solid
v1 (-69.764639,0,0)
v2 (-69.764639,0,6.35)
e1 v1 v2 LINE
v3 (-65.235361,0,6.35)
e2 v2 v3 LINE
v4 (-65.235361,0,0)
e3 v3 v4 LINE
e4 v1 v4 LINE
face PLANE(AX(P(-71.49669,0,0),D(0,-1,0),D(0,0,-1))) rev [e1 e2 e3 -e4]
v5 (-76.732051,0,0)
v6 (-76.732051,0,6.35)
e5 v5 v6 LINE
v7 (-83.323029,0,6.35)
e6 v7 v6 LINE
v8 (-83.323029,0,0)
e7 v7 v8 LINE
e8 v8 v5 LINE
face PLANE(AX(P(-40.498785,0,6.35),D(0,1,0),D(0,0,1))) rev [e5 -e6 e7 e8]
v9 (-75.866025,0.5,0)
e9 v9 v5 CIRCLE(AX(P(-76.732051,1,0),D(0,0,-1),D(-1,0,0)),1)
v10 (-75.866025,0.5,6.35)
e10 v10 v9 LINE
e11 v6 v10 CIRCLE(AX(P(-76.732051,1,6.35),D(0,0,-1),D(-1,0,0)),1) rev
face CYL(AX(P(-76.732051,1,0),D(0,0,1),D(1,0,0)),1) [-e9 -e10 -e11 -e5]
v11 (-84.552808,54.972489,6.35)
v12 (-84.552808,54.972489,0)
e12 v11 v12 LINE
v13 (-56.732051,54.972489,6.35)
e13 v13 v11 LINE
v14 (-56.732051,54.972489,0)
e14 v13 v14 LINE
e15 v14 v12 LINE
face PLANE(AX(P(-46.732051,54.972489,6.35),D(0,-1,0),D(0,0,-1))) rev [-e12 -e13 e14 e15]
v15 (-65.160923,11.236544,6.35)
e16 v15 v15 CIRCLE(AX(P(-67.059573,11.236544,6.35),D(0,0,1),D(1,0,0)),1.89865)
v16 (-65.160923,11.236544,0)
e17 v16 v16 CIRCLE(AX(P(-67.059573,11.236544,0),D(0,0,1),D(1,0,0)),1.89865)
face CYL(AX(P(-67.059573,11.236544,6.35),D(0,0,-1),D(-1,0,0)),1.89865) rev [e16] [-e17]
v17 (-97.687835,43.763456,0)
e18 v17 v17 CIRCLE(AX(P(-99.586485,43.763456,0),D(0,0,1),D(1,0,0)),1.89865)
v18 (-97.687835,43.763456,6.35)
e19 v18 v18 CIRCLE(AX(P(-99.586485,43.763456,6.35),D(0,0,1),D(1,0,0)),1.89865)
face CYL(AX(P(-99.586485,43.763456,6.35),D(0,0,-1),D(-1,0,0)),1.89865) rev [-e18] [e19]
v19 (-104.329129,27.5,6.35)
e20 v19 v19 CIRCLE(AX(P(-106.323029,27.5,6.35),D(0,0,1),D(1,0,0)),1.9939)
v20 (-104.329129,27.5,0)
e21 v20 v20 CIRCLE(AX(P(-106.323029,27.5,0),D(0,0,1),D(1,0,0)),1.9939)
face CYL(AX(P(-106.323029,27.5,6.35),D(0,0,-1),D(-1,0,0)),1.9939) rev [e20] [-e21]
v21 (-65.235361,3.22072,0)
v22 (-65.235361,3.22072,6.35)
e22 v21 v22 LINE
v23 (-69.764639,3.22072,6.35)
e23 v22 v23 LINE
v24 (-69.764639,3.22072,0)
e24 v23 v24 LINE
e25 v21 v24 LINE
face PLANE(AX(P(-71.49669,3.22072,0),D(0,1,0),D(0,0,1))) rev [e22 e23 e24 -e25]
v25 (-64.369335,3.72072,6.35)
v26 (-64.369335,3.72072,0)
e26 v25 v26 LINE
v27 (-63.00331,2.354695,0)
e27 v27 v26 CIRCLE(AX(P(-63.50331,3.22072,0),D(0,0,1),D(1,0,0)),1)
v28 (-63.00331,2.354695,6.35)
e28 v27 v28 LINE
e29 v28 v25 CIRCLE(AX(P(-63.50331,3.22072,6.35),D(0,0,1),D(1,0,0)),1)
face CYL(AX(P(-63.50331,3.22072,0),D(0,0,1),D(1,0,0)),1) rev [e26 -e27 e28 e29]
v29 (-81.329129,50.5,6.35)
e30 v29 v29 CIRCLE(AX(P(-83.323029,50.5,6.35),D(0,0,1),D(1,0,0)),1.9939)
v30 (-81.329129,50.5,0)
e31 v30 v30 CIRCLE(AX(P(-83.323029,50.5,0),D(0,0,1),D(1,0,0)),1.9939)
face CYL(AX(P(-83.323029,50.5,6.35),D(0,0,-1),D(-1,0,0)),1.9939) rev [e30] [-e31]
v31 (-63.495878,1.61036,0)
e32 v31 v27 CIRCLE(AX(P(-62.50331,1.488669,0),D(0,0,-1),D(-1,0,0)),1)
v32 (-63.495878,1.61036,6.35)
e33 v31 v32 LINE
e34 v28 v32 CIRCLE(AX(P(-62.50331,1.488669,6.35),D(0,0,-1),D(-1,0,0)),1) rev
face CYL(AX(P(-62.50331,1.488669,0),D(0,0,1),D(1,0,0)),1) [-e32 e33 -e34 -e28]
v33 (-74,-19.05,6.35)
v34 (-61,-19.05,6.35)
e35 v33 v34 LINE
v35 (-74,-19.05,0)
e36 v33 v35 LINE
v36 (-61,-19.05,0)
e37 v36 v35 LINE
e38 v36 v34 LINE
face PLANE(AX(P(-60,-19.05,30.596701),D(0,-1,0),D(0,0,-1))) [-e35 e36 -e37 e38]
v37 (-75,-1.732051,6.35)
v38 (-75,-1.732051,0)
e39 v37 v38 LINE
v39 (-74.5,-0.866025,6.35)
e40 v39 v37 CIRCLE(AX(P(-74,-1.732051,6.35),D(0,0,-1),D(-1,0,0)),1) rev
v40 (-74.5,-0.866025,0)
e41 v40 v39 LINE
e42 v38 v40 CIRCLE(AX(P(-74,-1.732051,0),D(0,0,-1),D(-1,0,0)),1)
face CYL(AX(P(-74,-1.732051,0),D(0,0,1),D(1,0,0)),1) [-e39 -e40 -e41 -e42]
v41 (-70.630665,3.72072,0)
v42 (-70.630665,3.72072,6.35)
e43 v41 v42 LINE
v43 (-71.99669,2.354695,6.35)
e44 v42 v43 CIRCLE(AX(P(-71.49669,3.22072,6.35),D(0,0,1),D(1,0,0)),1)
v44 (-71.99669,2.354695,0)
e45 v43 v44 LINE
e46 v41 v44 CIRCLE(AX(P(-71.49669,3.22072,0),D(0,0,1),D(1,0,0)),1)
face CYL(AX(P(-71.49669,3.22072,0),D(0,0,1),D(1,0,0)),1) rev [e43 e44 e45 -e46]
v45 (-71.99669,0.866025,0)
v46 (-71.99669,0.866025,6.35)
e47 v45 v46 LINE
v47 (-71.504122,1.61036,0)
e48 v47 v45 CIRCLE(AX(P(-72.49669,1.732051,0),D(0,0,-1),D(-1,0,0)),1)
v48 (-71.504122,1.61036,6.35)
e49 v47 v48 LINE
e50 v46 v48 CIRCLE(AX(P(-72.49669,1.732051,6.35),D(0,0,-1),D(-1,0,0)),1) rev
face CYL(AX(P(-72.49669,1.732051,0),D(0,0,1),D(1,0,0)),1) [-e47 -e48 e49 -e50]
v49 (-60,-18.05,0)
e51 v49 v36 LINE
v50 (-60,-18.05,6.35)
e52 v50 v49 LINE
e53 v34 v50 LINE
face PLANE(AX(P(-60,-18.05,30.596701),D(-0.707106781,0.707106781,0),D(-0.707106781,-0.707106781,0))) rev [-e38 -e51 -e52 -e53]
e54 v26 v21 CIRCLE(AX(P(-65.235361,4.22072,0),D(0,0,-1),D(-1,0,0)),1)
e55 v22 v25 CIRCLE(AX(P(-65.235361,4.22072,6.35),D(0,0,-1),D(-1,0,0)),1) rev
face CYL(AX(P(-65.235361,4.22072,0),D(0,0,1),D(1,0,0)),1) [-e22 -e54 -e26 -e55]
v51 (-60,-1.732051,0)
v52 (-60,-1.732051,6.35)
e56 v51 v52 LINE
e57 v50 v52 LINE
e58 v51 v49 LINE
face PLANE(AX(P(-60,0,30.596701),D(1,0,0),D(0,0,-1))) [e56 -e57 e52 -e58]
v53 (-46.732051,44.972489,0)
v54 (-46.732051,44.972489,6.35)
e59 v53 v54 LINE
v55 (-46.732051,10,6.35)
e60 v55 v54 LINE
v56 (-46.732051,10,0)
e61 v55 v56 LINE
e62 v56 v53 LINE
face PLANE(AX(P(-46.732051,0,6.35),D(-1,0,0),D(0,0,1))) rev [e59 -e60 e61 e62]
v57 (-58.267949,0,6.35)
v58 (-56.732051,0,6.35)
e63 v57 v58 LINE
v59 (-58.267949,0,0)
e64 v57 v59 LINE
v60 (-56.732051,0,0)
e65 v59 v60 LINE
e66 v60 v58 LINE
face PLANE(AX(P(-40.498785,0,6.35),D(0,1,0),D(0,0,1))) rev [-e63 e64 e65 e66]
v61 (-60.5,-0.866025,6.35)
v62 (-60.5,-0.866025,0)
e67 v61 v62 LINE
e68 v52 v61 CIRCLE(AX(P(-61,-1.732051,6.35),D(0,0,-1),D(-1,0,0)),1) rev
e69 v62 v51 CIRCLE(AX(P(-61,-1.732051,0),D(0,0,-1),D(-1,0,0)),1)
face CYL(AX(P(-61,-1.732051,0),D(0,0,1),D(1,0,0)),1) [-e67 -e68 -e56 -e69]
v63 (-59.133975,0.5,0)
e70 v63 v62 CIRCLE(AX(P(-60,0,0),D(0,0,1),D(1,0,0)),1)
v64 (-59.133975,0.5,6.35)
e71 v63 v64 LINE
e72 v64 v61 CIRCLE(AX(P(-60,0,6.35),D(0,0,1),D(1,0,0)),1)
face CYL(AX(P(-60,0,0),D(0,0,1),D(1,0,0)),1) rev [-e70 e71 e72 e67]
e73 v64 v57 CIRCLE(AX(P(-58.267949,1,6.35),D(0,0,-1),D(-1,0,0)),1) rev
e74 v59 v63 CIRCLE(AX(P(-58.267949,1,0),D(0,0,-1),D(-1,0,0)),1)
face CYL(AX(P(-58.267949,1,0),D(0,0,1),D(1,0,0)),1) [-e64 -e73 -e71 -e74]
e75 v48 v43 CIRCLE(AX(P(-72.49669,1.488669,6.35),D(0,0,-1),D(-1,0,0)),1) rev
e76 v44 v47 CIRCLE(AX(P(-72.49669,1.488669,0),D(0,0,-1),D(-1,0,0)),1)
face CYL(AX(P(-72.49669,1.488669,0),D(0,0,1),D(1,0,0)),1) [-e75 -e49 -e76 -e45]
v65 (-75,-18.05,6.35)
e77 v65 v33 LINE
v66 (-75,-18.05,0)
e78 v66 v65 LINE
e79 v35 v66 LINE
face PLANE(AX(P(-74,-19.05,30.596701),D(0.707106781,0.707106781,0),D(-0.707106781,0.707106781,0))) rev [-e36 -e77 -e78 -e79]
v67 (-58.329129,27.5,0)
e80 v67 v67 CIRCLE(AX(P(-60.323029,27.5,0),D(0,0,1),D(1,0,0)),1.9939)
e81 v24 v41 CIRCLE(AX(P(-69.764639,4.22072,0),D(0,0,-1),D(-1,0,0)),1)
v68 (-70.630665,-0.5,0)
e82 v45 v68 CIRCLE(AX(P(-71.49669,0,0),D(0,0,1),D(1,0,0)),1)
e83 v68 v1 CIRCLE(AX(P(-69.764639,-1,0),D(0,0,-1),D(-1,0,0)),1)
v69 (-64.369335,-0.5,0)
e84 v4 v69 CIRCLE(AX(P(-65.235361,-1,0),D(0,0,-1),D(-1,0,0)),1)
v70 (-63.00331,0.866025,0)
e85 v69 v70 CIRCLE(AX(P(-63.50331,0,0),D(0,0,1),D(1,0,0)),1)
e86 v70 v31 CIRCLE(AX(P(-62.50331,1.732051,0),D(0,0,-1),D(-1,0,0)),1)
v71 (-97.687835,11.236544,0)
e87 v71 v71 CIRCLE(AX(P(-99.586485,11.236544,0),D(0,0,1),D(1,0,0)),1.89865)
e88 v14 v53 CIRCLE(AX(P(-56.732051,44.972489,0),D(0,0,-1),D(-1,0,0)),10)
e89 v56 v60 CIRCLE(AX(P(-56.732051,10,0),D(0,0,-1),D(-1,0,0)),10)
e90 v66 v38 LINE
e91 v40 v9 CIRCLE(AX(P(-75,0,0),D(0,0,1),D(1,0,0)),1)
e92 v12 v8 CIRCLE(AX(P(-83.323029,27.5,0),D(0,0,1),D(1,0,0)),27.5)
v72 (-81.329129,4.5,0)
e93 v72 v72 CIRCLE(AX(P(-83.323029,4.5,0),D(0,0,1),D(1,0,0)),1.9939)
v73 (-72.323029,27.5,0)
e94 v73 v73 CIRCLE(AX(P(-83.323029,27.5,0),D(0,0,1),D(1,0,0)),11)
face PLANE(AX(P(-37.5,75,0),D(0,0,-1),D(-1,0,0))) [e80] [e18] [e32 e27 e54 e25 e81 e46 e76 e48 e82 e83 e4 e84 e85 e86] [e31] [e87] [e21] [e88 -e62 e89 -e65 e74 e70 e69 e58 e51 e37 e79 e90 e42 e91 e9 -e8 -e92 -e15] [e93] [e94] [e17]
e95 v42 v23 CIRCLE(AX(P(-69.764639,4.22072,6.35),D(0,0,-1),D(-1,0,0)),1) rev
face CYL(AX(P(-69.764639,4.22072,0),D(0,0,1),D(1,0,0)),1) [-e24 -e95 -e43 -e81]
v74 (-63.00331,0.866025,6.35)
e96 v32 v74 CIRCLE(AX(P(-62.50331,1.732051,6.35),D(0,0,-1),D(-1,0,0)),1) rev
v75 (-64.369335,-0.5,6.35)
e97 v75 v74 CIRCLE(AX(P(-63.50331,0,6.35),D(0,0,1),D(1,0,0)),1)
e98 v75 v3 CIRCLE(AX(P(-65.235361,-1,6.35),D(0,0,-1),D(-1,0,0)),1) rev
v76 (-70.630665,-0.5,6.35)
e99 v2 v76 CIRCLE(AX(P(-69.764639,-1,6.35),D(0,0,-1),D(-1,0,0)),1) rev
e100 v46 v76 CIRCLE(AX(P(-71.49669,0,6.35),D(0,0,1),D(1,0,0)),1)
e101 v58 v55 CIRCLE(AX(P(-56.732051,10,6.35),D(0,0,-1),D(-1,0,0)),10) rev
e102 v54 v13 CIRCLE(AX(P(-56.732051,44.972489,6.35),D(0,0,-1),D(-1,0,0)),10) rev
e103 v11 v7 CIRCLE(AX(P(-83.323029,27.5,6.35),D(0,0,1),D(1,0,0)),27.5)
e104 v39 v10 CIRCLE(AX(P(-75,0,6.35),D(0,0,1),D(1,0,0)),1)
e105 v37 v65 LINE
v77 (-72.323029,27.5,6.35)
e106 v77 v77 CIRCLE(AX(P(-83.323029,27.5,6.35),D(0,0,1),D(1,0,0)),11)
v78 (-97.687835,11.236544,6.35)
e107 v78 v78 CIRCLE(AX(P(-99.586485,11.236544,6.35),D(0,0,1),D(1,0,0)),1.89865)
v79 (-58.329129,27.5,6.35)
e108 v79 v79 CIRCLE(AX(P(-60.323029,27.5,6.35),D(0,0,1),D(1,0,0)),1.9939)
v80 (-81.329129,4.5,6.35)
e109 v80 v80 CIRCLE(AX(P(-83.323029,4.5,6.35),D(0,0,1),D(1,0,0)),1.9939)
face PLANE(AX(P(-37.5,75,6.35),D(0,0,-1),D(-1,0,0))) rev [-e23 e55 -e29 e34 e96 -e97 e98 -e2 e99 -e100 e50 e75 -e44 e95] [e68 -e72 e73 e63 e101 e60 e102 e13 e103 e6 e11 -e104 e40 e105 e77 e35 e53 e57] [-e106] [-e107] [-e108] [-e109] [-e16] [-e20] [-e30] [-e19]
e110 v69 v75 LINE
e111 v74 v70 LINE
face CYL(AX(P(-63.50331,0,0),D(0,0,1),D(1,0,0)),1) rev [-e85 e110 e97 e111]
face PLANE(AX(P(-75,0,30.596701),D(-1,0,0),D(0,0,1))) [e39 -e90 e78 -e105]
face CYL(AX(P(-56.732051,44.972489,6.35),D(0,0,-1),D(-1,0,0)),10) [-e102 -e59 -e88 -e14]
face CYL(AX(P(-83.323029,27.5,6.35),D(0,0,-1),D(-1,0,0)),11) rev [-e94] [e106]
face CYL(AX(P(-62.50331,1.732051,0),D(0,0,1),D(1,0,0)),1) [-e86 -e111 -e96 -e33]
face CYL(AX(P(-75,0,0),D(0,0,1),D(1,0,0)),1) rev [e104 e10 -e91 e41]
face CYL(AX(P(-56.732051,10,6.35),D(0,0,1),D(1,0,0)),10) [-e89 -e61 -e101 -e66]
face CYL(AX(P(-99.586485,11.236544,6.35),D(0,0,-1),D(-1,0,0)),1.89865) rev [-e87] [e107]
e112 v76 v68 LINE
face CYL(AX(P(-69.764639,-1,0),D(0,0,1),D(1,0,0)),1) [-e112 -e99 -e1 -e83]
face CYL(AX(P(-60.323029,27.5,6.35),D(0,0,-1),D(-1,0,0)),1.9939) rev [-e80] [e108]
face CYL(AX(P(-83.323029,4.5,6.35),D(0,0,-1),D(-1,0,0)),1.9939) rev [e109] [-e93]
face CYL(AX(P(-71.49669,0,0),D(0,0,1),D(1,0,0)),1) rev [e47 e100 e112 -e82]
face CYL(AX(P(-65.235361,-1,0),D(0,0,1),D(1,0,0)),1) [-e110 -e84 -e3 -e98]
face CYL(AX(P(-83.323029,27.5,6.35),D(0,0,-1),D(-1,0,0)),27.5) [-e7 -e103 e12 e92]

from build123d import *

# Parameters (mm, degrees)
SKETCH1_R           = 11
SKETCH1_R_2         = 1.89865
SKETCH1_R_3         = 1.9939
BOSS_EXTRUDE1_DEPTH = 6.35
FILLET1_R           = 10
SKETCH2_W           = 15
SKETCH2_H           = 19.05
BOSS_EXTRUDE2_DEPTH = 6.35
CHAMFER1_SIZE       = 1
SKETCH3_R           = 1
CUT_EXTRUDE1_DEPTH  = 159.045298363
SKETCH4_W           = 7.99338
SKETCH4_H           = 3.22072
CUT_EXTRUDE2_DEPTH  = 159.045298363
FILLET3_R           = 1
CUT_EXTRUDE3_DEPTH  = 159.045298363
FILLET4_R           = 10
SKETCH9_R           = 1
CUT_EXTRUDE4_DEPTH  = 124.871065449
FILLET5_R           = 1


with BuildPart() as part:
    # Sketch1 → Boss-Extrude1 (new body)
    with BuildSketch(Plane.XY):
        with BuildLine():
            Line((-40.498784978, 0), (0, 0))
            Line((0, 0), (0, 75))
            ThreePointArc((0, 75), (-37.5, 112.5), (-75, 75))
            Line((-75, 75), (-75, 55))
            Line((-75, 55), (-83.323029145, 55))
            ThreePointArc((-83.323029145, 55), (-110.823029145, 27.5), (-83.323029145, 0))
            Line((-83.323029145, 0), (-40.498784978, 0))
        make_face()
        with Locations((-83.323029145, 27.5)):
            Circle(SKETCH1_R, mode=Mode.SUBTRACT)
        with Locations((-67.059573177, 11.236544033)):
            Circle(SKETCH1_R_2, mode=Mode.SUBTRACT)
        with Locations((-83.323029145, 50.5)):
            Circle(SKETCH1_R_3, mode=Mode.SUBTRACT)
        with Locations((-99.586485112, 11.236544033)):
            Circle(SKETCH1_R_2, mode=Mode.SUBTRACT)
        with Locations((-60.323029145, 27.5)):
            Circle(SKETCH1_R_3, mode=Mode.SUBTRACT)
        with Locations((-99.586485112, 43.763455967)):
            Circle(SKETCH1_R_2, mode=Mode.SUBTRACT)
        with Locations((-83.323029145, 4.5)):
            Circle(SKETCH1_R_3, mode=Mode.SUBTRACT)
        with Locations((-106.323029145, 27.5)):
            Circle(SKETCH1_R_3, mode=Mode.SUBTRACT)
    extrude(amount=BOSS_EXTRUDE1_DEPTH)

    # Fillet1
    fillet1_edges = [part.edges().sort_by_distance(p)[0] for p in [
        (-75, 55, 3.175),
    ]]
    fillet(fillet1_edges, radius=FILLET1_R)

    # Sketch2 → Boss-Extrude2 (add)
    with BuildSketch(Plane(origin=(0, 0, 0), x_dir=(-1, 0, 0), z_dir=(0, 0, -1))):
        with Locations((7.5, -9.525)):
            Rectangle(SKETCH2_W, SKETCH2_H)
        with Locations((37.5, -9.525)):
            Rectangle(SKETCH2_W, SKETCH2_H)
        with Locations((67.5, -9.525)):
            Rectangle(SKETCH2_W, SKETCH2_H)
    extrude(amount=-BOSS_EXTRUDE2_DEPTH)

    # Chamfer1
    chamfer1_edges = [part.edges().sort_by_distance(p)[0] for p in [
        (0, -19.05, 3.175),
        (-15, -19.05, 3.175),
        (-30, -19.05, 3.175),
        (-45, -19.05, 3.175),
        (-60, -19.05, 3.175),
        (-75, -19.05, 3.175),
    ]]
    chamfer(chamfer1_edges, length=CHAMFER1_SIZE)

    # Sketch3 → Cut-Extrude1 (cut, through all)
    with BuildSketch(Plane.XY.offset(6.35)):
        with Locations((-75, 0)):
            Circle(SKETCH3_R)
        with Locations((-60, 0)):
            Circle(SKETCH3_R)
        with Locations((-45, 0)):
            Circle(SKETCH3_R)
        with Locations((-30, 0)):
            Circle(SKETCH3_R)
        with Locations((-15, 0)):
            Circle(SKETCH3_R)
    extrude(amount=-CUT_EXTRUDE1_DEPTH, mode=Mode.SUBTRACT)

    # Sketch4 → Cut-Extrude2 (cut, through all)
    with BuildSketch(Plane.XY.offset(6.35)):
        with Locations((-67.5, 1.61036)):
            Rectangle(SKETCH4_W, SKETCH4_H)
    extrude(amount=-CUT_EXTRUDE2_DEPTH, mode=Mode.SUBTRACT)

    # Fillet3
    fillet3_edges = [part.edges().sort_by_distance(p)[0] for p in [
        (-75, -1, 3.175),
        (-76, 0, 3.175),
        (-60, -1, 3.175),
        (-59, 0, 3.175),
        (-45, -1, 3.175),
        (-46, 0, 3.175),
        (-30, -1, 3.175),
        (-29, 0, 3.175),
        (-15, -1, 3.175),
        (-16, 0, 3.175),
    ]]
    fillet(fillet3_edges, radius=FILLET3_R)

    # Sketch5 → Cut-Extrude3 (cut, through all)
    with BuildSketch(Plane(origin=(0, 0, 0), x_dir=(-1, 0, 0), z_dir=(0, 0, -1))):
        Polygon((46.732050808, 0), (46.732050808, 54.972488867), (84.552807772, 54.972488867), (84.552807772, 112.5), (0, 112.5), (0, -19.05), (46.732050808, -19.05), align=None)
    extrude(amount=-CUT_EXTRUDE3_DEPTH, mode=Mode.SUBTRACT)

    # Fillet4
    fillet4_edges = [part.edges().sort_by_distance(p)[0] for p in [
        (-46.732050808, 0, 3.175),
        (-46.732050808, 54.972488867, 3.175),
    ]]
    fillet(fillet4_edges, radius=FILLET4_R)

    # Sketch9 → Cut-Extrude4 (cut, through all)
    with BuildSketch(Plane.XY.offset(6.35)):
        with Locations((-71.49669, 3.22072)):
            Circle(SKETCH9_R)
        with Locations((-63.50331, 3.22072)):
            Circle(SKETCH9_R)
        with Locations((-63.50331, 0)):
            Circle(SKETCH9_R)
        with Locations((-71.49669, 0)):
            Circle(SKETCH9_R)
    extrude(amount=-CUT_EXTRUDE4_DEPTH, mode=Mode.SUBTRACT)

    # Fillet5
    # the kernel refuses this fillet: 1 mm, written as the material it takes off along each edge
    with BuildSketch(Plane(origin=(-64.50331, 3.22072, -1.830127019), x_dir=(0.2588190451025049, 0.9659258262890725, 0), z_dir=(0, 0, 1)), Plane(origin=(-63.50331, 1, -1.830127019), x_dir=(0.9659258262890688, -0.25881904510251885, 0), z_dir=(0, 0, 1)), Plane(origin=(-71.49669, 2.22072, -1.830127019), x_dir=(-0.9659258262890682, 0.25881904510252124, 0), z_dir=(0, 0, 1))) as fillet5_piece_1:
        with BuildLine():
            CenterArc((0.776457135, 0.965925826), FILLET5_R, 195, 60)
            Line((-0.189468691, 0.707106781), (0, 0))
            ThreePointArc((0, 0), (0.258819045, 0.034074174), (0.51763809, 0))
        make_face()
    extrude(amount=10.010254038, mode=Mode.SUBTRACT)
    with BuildSketch(Plane(origin=(-63.50331, 2.22072, -1.830127019), x_dir=(0, -1, 0), z_dir=(0, 0, 1)), Plane(origin=(-71.49669, 1, -1.830127019), x_dir=(0, 1, 0), z_dir=(0, 0, 1))) as fillet5_piece_2:
        with BuildLine():
            CenterArc((0.732050808, 1), FILLET5_R, 210, 60)
            ThreePointArc((-0.133974596, 0.5), (-0.034074174, 0.258819045), (0, 0))
            Line((0, 0), (0.732050808, 0))
        make_face()
    extrude(amount=10.010254038, mode=Mode.SUBTRACT)
    with BuildSketch(Plane(origin=(-64.50331, 0, -1.830127019), x_dir=(0.2588190451025049, -0.9659258262890725, 0), z_dir=(0, 0, 1)), Plane(origin=(-70.49669, 0, 8.180127019), x_dir=(-0.25881904510253045, -0.9659258262890658, 0), z_dir=(0, 0, -1))) as fillet5_piece_3:
        with BuildLine():
            CenterArc((0.776457135, -0.965925826), FILLET5_R, 105, 60)
            Line((-0.189468691, -0.707106781), (0, 0))
            ThreePointArc((0, 0), (0.258819045, -0.034074174), (0.51763809, 0))
        make_face()
    extrude(amount=10.010254038, mode=Mode.SUBTRACT)
    with BuildSketch(Plane(origin=(-70.49669, 3.22072, 8.180127019), x_dir=(1, 0, 0), z_dir=(0, 0, -1))) as fillet5_piece_4:
        with BuildLine():
            CenterArc((0.732050808, -1), FILLET5_R, 90, 60)
            ThreePointArc((-0.133974596, -0.5), (-0.034074174, -0.258819045), (0, 0))
            Line((0, 0), (0.732050808, 0))
        make_face()
    extrude(amount=10.010254038, mode=Mode.SUBTRACT)


solid = part.part
